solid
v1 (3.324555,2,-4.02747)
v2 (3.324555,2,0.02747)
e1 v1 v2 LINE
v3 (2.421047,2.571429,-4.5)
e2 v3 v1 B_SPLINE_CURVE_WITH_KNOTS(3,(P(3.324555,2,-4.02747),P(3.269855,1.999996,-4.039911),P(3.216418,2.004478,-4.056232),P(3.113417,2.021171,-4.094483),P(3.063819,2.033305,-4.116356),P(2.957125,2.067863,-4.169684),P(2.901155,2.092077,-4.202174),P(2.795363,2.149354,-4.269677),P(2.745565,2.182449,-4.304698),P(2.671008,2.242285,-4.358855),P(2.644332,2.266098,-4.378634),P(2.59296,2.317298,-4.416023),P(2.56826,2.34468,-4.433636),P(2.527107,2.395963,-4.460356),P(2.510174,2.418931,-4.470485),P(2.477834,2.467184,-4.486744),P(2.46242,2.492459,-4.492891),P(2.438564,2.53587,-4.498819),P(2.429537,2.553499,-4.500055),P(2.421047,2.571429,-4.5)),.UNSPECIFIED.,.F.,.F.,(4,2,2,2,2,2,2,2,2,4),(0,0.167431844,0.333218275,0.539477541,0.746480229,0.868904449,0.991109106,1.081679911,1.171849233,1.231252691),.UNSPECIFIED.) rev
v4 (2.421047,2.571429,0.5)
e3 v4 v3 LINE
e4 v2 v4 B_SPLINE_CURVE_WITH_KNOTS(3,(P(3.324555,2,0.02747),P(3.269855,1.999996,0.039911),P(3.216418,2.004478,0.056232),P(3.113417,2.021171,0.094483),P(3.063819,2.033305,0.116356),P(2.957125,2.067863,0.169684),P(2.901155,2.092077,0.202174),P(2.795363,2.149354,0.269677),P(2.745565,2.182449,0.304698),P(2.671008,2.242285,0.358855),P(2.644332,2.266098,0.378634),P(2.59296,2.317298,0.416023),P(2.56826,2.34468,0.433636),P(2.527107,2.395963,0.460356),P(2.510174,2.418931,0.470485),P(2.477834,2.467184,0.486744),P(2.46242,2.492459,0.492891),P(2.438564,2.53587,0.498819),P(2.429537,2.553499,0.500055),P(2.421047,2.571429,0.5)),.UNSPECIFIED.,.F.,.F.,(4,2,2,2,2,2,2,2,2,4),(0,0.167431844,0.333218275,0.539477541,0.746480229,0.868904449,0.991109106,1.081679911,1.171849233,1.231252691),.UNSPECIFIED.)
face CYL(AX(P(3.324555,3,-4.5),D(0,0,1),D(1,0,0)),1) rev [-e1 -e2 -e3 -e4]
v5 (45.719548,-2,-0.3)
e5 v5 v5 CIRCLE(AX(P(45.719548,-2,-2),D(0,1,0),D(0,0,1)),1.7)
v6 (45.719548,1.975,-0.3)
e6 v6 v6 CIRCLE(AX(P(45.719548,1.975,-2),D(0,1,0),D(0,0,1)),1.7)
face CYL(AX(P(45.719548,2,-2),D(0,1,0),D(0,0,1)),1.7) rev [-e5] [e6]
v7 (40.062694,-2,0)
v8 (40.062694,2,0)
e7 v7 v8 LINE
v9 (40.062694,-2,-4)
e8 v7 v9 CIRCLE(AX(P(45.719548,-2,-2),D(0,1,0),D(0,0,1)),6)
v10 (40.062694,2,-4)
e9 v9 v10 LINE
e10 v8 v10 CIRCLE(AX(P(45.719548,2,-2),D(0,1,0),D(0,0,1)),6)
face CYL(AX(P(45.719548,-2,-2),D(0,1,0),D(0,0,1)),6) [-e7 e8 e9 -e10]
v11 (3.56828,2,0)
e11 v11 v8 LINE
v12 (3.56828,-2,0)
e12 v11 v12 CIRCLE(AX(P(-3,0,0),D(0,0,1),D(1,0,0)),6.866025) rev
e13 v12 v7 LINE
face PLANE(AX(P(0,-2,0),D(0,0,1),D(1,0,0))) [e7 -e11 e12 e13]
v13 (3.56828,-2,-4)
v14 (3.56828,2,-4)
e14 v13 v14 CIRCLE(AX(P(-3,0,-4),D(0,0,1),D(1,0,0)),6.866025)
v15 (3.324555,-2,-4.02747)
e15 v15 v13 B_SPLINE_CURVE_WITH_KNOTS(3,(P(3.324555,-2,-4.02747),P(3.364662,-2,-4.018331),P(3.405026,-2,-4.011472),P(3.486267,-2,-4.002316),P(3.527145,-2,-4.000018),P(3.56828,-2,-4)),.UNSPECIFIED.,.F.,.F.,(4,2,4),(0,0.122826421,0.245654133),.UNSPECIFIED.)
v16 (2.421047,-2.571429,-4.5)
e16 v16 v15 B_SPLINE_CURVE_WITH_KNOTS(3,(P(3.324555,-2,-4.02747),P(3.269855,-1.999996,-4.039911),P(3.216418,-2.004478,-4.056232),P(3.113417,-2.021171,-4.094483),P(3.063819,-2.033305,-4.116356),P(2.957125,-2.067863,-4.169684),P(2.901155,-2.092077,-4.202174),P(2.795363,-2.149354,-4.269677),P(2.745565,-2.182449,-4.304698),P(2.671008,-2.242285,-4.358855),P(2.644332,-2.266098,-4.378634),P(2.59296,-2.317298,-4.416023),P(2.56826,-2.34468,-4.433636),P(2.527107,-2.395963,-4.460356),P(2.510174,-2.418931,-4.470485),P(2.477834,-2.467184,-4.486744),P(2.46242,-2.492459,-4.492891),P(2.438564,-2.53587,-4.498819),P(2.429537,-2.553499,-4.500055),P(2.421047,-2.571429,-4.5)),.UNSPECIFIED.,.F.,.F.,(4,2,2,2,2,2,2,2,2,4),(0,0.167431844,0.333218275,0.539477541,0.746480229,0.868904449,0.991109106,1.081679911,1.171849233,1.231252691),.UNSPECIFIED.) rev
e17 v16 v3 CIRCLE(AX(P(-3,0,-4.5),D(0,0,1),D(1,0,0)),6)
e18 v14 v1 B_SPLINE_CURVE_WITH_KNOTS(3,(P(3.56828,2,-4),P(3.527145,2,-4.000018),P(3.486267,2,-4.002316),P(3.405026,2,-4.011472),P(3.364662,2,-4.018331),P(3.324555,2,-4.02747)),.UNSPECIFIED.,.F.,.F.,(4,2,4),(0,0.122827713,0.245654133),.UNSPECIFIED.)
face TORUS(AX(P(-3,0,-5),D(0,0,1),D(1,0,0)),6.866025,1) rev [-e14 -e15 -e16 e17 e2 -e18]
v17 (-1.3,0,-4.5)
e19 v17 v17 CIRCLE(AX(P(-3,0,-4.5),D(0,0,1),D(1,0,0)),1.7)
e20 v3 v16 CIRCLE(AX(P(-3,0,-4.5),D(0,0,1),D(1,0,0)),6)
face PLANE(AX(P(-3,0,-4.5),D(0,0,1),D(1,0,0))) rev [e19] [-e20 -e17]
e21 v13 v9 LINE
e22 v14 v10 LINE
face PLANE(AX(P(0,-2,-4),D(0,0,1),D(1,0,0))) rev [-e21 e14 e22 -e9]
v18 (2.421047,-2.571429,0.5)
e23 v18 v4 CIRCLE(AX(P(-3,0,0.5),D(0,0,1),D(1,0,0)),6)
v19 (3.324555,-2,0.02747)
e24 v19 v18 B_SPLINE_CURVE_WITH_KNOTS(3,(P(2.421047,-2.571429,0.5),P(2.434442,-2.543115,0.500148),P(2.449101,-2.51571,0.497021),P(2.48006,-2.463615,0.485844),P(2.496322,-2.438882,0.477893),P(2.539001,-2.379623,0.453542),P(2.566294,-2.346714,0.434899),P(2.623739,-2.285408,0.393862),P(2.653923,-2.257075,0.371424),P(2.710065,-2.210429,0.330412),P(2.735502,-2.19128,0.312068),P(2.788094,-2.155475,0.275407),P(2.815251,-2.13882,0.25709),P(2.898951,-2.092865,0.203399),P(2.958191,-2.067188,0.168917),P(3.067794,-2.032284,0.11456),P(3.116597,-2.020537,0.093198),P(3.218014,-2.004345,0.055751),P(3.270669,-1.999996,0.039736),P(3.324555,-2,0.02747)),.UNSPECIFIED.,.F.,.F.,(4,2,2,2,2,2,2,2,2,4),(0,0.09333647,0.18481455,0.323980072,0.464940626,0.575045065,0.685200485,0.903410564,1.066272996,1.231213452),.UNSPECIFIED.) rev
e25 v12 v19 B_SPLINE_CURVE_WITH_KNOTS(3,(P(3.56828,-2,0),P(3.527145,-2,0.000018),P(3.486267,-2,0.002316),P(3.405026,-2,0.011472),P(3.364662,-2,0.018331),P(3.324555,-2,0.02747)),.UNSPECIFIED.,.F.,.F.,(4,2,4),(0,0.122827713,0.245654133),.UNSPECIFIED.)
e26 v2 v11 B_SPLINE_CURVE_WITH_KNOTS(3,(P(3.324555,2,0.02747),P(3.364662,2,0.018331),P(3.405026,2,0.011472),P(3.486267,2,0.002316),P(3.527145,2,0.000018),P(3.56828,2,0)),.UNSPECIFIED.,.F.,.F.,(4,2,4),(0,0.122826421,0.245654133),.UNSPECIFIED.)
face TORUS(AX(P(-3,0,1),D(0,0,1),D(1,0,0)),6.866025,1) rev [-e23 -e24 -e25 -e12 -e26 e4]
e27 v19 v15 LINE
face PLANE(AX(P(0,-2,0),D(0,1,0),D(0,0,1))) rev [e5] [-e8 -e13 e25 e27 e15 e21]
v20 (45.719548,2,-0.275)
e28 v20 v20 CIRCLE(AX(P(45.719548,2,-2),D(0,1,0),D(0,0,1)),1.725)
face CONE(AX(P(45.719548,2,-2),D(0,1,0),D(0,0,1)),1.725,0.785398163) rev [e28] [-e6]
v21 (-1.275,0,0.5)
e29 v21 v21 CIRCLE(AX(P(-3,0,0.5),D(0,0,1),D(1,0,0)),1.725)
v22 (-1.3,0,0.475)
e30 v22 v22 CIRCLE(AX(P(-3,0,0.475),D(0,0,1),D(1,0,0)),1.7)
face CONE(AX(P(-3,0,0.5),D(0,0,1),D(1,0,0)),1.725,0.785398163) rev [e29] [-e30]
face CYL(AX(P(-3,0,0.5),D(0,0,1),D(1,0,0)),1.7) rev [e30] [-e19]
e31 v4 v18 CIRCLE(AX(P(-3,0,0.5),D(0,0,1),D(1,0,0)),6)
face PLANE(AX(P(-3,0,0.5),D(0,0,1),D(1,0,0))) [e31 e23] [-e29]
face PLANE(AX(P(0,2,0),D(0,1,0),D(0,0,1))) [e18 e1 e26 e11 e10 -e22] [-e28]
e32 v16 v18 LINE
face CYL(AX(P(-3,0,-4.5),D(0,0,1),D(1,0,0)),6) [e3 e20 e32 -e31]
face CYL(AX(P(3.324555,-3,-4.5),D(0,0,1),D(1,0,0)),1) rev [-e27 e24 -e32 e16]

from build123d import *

# Parameters (mm, degrees)
BOSS_EXTRUDE10_DEPTH           = 2.5
BOSS_EXTRUDE10_DEPTH_BACK      = 2.5
SKETCH7_R                      = 6
BOSS_EXTRUDE11_DEPTH           = 2
BOSS_EXTRUDE11_DEPTH_BACK      = 2
FILLET4_R                      = 1
M3_CLEARANCE_HOLE1_D           = 3.4
M3_CLEARANCE_HOLE1_CSINK_D     = 3.45
M3_CLEARANCE_HOLE1_CSINK_ANGLE = 90
M3_CLEARANCE_HOLE2_D           = 3.4
M3_CLEARANCE_HOLE2_CSINK_D     = 3.45
M3_CLEARANCE_HOLE2_CSINK_ANGLE = 90


with BuildPart() as part:
    # Sketch7 → Boss-Extrude10 (new, two sides: drawn at the far end of the back side and taken through both)
    with BuildSketch(Plane.XY.offset(-2).offset(-BOSS_EXTRUDE10_DEPTH_BACK)):
        with Locations((-3, 0)):
            Circle(SKETCH7_R)
    extrude(amount=BOSS_EXTRUDE10_DEPTH + BOSS_EXTRUDE10_DEPTH_BACK)

    # Sketch4 → Boss-Extrude11 (add, two sides: drawn at the far end of the back side and taken through both)
    with BuildSketch(Plane(origin=(0, 0, 0), x_dir=(1, 0, 0), z_dir=(0, 1, 0)).offset(-BOSS_EXTRUDE11_DEPTH_BACK)):
        with BuildLine():
            ThreePointArc((40.062693756, 4), (39.719548005, 2), (40.062693756, 0))
            Line((40.062693756, 0), (45.719548005, 0))
            Line((45.719548005, 0), (45.719548005, 4))
            Line((45.719548005, 4), (40.062693756, 4))
        make_face()
        with BuildLine():
            Line((45.719548005, 0), (40.062693756, 0))
            ThreePointArc((40.062693756, 0), (46.734159878, -3.913591358), (51.719548005, 2))
            ThreePointArc((51.719548005, 2), (46.734159878, 7.913591358), (40.062693756, 4))
            Line((40.062693756, 4), (45.719548005, 4))
            Line((45.719548005, 4), (45.719548005, 0))
        make_face()
        with BuildLine():
            Line((0, 4), (0, 0))
            Line((0, 0), (40.062693756, 0))
            ThreePointArc((40.062693756, 0), (39.719548005, 2), (40.062693756, 4))
            Line((40.062693756, 4), (0, 4))
        make_face()
    extrude(amount=BOSS_EXTRUDE11_DEPTH + BOSS_EXTRUDE11_DEPTH_BACK)

    # Fillet4
    # the kernel refuses this fillet: 1 mm, written as the material it adds along each edge
    with BuildSketch(Plane(origin=(2.656854249, 2, 0), x_dir=(-0.381458859418171, 0.9243858169462511, 1.7363680755605478e-15), z_dir=(0, 0, -1)), Plane(origin=(2.656854249, -2, -4), x_dir=(-0.3814588594181449, -0.924385816946262, 1.7363680755604279e-15), z_dir=(0, 0, 1))) as fillet4_piece_1:
        with BuildLine():
            CenterArc((0.669685328, 0.998672259), FILLET4_R, 202.42407708, 64.623066475)
            Line((-0.254700489, 0.6172134), (-0.273188205, 0.609584223))
            Line((-0.273188205, 0.609584223), (-0.018487716, -0.007629177))
            Line((-0.018487716, -0.007629177), (0.001030285, -0.019973445))
            ThreePointArc((0.001030285, -0.019973445), (0.309085536, -0.012033556), (0.617140787, -0.019973445))
            Line((0.617140787, -0.019973445), (0.618171072, 0))
        make_face()
    extrude(amount=4)
    with BuildSketch(Plane(origin=(-3, 0, -4), x_dir=(0.764399035602867, -0.6447434484889372, 0), z_dir=(-0.6447434484889372, -0.764399035602867, 0))) as fillet4_piece_2_section:
        with BuildLine():
            CenterArc((6.866025404, -1), FILLET4_R, 90, 60)
            Line((6.866025404, 0), (6.866025404, 0.02))
            Line((6.866025404, 0.02), (6, 0.02))
            Line((6, 0.02), (5.98, 0))
            ThreePointArc((5.98, 0), (5.98, -0.25), (5.982679492, -0.49))
            Line((5.982679492, -0.49), (6, -0.5))
        make_face()
    fillet4_piece_2 = revolve(axis=Axis((-3, 0, -4), (0, 0, 1)), revolution_arc=40.146442844, mode=Mode.PRIVATE)
    fillet4_piece_2 = split(fillet4_piece_2, bisect_by=Plane(origin=(3.105396532, -2, -4.129597007), z_dir=(0, 1, 0)), keep=Keep.TOP, mode=Mode.PRIVATE)
    add(fillet4_piece_2)
    with BuildSketch(Plane(origin=(-3, 0, 0), x_dir=(0.7643990356028665, 0.6447434484889378, 0), z_dir=(-0.6447434484889378, 0.7643990356028665, 0))) as fillet4_piece_3_section:
        with BuildLine():
            CenterArc((6.866025404, -1), FILLET4_R, 90, 60)
            Line((6.866025404, 0), (6.866025404, 0.02))
            Line((6.866025404, 0.02), (6, 0.02))
            Line((6, 0.02), (5.98, 0))
            ThreePointArc((5.98, 0), (5.98, -0.25), (5.982679492, -0.49))
            Line((5.982679492, -0.49), (6, -0.5))
        make_face()
    fillet4_piece_3 = revolve(axis=Axis((-3, 0, 0), (0, 0, -1)), revolution_arc=40.146442844, mode=Mode.PRIVATE)
    fillet4_piece_3 = split(fillet4_piece_3, bisect_by=Plane(origin=(3.105396532, 2, 0.129597007), z_dir=(0, -1, 0)), keep=Keep.TOP, mode=Mode.PRIVATE)
    add(fillet4_piece_3)
    with BuildSketch(Plane(origin=(-3, 0, 0), x_dir=(1, 0, 0), z_dir=(0, 1, 0))) as fillet4_piece_4_section:
        with BuildLine():
            CenterArc((6.866025404, -1), FILLET4_R, 90, 60)
            Line((6.866025404, 0), (6.866025404, 0.02))
            Line((6.866025404, 0.02), (6, 0.02))
            Line((6, 0.02), (5.98, 0))
            ThreePointArc((5.98, 0), (5.98, -0.25), (5.982679492, -0.49))
            Line((5.982679492, -0.49), (6, -0.5))
        make_face()
    fillet4_piece_4 = revolve(axis=Axis((-3, 0, 0), (0, 0, -1)), revolution_arc=40.146442844, mode=Mode.PRIVATE)
    fillet4_piece_4 = split(fillet4_piece_4, bisect_by=Plane(origin=(3.105396981, -2, 0.129596926), z_dir=(0, 1, 0)), keep=Keep.TOP, mode=Mode.PRIVATE)
    add(fillet4_piece_4)
    with BuildSketch(Plane(origin=(-3, 0, -4), x_dir=(1, 0, 0), z_dir=(0, -1, 0))) as fillet4_piece_5_section:
        with BuildLine():
            CenterArc((6.866025404, -1), FILLET4_R, 90, 60)
            Line((6.866025404, 0), (6.866025404, 0.02))
            Line((6.866025404, 0.02), (6, 0.02))
            Line((6, 0.02), (5.98, 0))
            ThreePointArc((5.98, 0), (5.98, -0.25), (5.982679492, -0.49))
            Line((5.982679492, -0.49), (6, -0.5))
        make_face()
    fillet4_piece_5 = revolve(axis=Axis((-3, 0, -4), (0, 0, 1)), revolution_arc=40.146442844, mode=Mode.PRIVATE)
    fillet4_piece_5 = split(fillet4_piece_5, bisect_by=Plane(origin=(3.105396981, 2, -4.129596926), z_dir=(0, -1, 0)), keep=Keep.TOP, mode=Mode.PRIVATE)
    add(fillet4_piece_5)
    with BuildSketch(Plane(origin=(-3, 0, 0), x_dir=(0.7643990356028665, 0.6447434484889378, 0), z_dir=(-0.6447434484889378, 0.7643990356028665, 0))) as fillet4_piece_6a_section:
        with BuildLine():
            CenterArc((6.866025404, -1), FILLET4_R, 90, 60)
            Line((6.866025404, 0), (6.866025404, 0.02))
            Line((6.866025404, 0.02), (6, 0.02))
            Line((6, 0.02), (5.98, 0))
            ThreePointArc((5.98, 0), (5.98, -0.25), (5.982679492, -0.49))
            Line((5.982679492, -0.49), (6, -0.5))
        make_face()
    fillet4_piece_6a = revolve(axis=Axis((-3, 0, 0), (0, 0, -1)), revolution_arc=40.146442844, mode=Mode.PRIVATE)
    fillet4_piece_6a = split(fillet4_piece_6a, bisect_by=Plane(origin=(2.392166005, 2, 0.125287607), z_dir=(0, 1, 0)), keep=Keep.TOP, mode=Mode.PRIVATE)
    with BuildSketch(Plane(origin=(2.656854249, 2, 1.669252677), x_dir=(-0.38145885941817037, 0.9243858169462514, 1.7363680755605446e-15), z_dir=(0, 0, -1))) as fillet4_piece_6b_section:
        with BuildLine():
            CenterArc((0.669685328, 0.998672259), FILLET4_R, 202.42407708, 64.623066475)
            Line((-0.254700489, 0.6172134), (-0.273188205, 0.609584223))
            Line((-0.273188205, 0.609584223), (-0.018487716, -0.007629177))
            Line((-0.018487716, -0.007629177), (0.001030285, -0.019973445))
            ThreePointArc((0.001030285, -0.019973445), (0.309085536, -0.012033556), (0.617140787, -0.019973445))
            Line((0.617140787, -0.019973445), (0.618171072, 0))
        make_face()
    fillet4_piece_6b = extrude(amount=5.669252677, mode=Mode.PRIVATE)
    fillet4_piece_6b = split(fillet4_piece_6b, bisect_by=Plane(origin=(2.758670991, 2.124773094, 0.5), z_dir=(0, 0, -1)), keep=Keep.TOP, mode=Mode.PRIVATE)
    fillet4_piece_6b = split(fillet4_piece_6b, bisect_by=Plane(origin=(2.758670991, 2.124773094, 0), z_dir=(0, 0, 1)), keep=Keep.TOP, mode=Mode.PRIVATE)
    fillet4_piece_6 = fillet4_piece_6a & fillet4_piece_6b
    add(fillet4_piece_6)
    with BuildSketch(Plane(origin=(-3, 0, -4), x_dir=(1, 0, 0), z_dir=(0, -1, 0))) as fillet4_piece_7a_section:
        with BuildLine():
            CenterArc((6.866025404, -1), FILLET4_R, 90, 60)
            Line((6.866025404, 0), (6.866025404, 0.02))
            Line((6.866025404, 0.02), (6, 0.02))
            Line((6, 0.02), (5.98, 0))
            ThreePointArc((5.98, 0), (5.98, -0.25), (5.982679492, -0.49))
            Line((5.982679492, -0.49), (6, -0.5))
        make_face()
    fillet4_piece_7a = revolve(axis=Axis((-3, 0, -4), (0, 0, 1)), revolution_arc=40.146442844, mode=Mode.PRIVATE)
    fillet4_piece_7a = split(fillet4_piece_7a, bisect_by=Plane(origin=(2.392165487, 2, -4.125287706), z_dir=(0, 1, 0)), keep=Keep.TOP, mode=Mode.PRIVATE)
    with BuildSketch(Plane(origin=(2.656854249, 2, 0), x_dir=(-0.381458859418171, 0.9243858169462511, 1.7363680755605478e-15), z_dir=(0, 0, -1))) as fillet4_piece_7b_section:
        with BuildLine():
            CenterArc((0.669685328, 0.998672259), FILLET4_R, 202.42407708, 64.623066475)
            Line((-0.254700489, 0.6172134), (-0.273188205, 0.609584223))
            Line((-0.273188205, 0.609584223), (-0.018487716, -0.007629177))
            Line((-0.018487716, -0.007629177), (0.001030285, -0.019973445))
            ThreePointArc((0.001030285, -0.019973445), (0.309085536, -0.012033556), (0.617140787, -0.019973445))
            Line((0.617140787, -0.019973445), (0.618171072, 0))
        make_face()
    fillet4_piece_7b = extrude(amount=5.669252677, mode=Mode.PRIVATE)
    fillet4_piece_7b = split(fillet4_piece_7b, bisect_by=Plane(origin=(2.758670991, 2.124773094, -4.5), z_dir=(0, 0, 1)), keep=Keep.TOP, mode=Mode.PRIVATE)
    fillet4_piece_7b = split(fillet4_piece_7b, bisect_by=Plane(origin=(2.758670991, 2.124773094, -4), z_dir=(0, 0, -1)), keep=Keep.TOP, mode=Mode.PRIVATE)
    fillet4_piece_7 = fillet4_piece_7a & fillet4_piece_7b
    add(fillet4_piece_7)
    with BuildSketch(Plane(origin=(2.656854249, -2, -5.669252677), x_dir=(-0.38145885941816965, -0.9243858169462517, 1.7363680755605413e-15), z_dir=(0, 0, 1))) as fillet4_piece_8a_section:
        with BuildLine():
            CenterArc((0.669685328, 0.998672259), FILLET4_R, 202.42407708, 64.623066475)
            Line((-0.254700489, 0.6172134), (-0.273188205, 0.609584223))
            Line((-0.273188205, 0.609584223), (-0.018487716, -0.007629177))
            Line((-0.018487716, -0.007629177), (0.001030285, -0.019973445))
            ThreePointArc((0.001030285, -0.019973445), (0.309085536, -0.012033556), (0.617140787, -0.019973445))
            Line((0.617140787, -0.019973445), (0.618171072, 0))
        make_face()
    fillet4_piece_8a = extrude(amount=5.669252677, mode=Mode.PRIVATE)
    fillet4_piece_8a = split(fillet4_piece_8a, bisect_by=Plane(origin=(2.758670991, -2.124773094, -4.5), z_dir=(0, 0, 1)), keep=Keep.TOP, mode=Mode.PRIVATE)
    fillet4_piece_8a = split(fillet4_piece_8a, bisect_by=Plane(origin=(2.758670991, -2.124773094, -4), z_dir=(0, 0, -1)), keep=Keep.TOP, mode=Mode.PRIVATE)
    with BuildSketch(Plane(origin=(-3, 0, -4), x_dir=(0.764399035602867, -0.6447434484889372, 0), z_dir=(-0.6447434484889372, -0.764399035602867, 0))) as fillet4_piece_8b_section:
        with BuildLine():
            CenterArc((6.866025404, -1), FILLET4_R, 90, 60)
            Line((6.866025404, 0), (6.866025404, 0.02))
            Line((6.866025404, 0.02), (6, 0.02))
            Line((6, 0.02), (5.98, 0))
            ThreePointArc((5.98, 0), (5.98, -0.25), (5.982679492, -0.49))
            Line((5.982679492, -0.49), (6, -0.5))
        make_face()
    fillet4_piece_8b = revolve(axis=Axis((-3, 0, -4), (0, 0, 1)), revolution_arc=40.146442844, mode=Mode.PRIVATE)
    fillet4_piece_8b = split(fillet4_piece_8b, bisect_by=Plane(origin=(2.392166005, -2, -4.125287607), z_dir=(0, -1, 0)), keep=Keep.TOP, mode=Mode.PRIVATE)
    fillet4_piece_8 = fillet4_piece_8a & fillet4_piece_8b
    add(fillet4_piece_8)
    with BuildSketch(Plane(origin=(-3, 0, 0), x_dir=(1, 0, 0), z_dir=(0, 1, 0))) as fillet4_piece_9a_section:
        with BuildLine():
            CenterArc((6.866025404, -1), FILLET4_R, 90, 60)
            Line((6.866025404, 0), (6.866025404, 0.02))
            Line((6.866025404, 0.02), (6, 0.02))
            Line((6, 0.02), (5.98, 0))
            ThreePointArc((5.98, 0), (5.98, -0.25), (5.982679492, -0.49))
            Line((5.982679492, -0.49), (6, -0.5))
        make_face()
    fillet4_piece_9a = revolve(axis=Axis((-3, 0, 0), (0, 0, -1)), revolution_arc=40.146442844, mode=Mode.PRIVATE)
    fillet4_piece_9a = split(fillet4_piece_9a, bisect_by=Plane(origin=(2.392165487, -2, 0.125287706), z_dir=(0, -1, 0)), keep=Keep.TOP, mode=Mode.PRIVATE)
    with BuildSketch(Plane(origin=(2.656854249, -2, -4), x_dir=(-0.3814588594181449, -0.924385816946262, 1.7363680755604279e-15), z_dir=(0, 0, 1))) as fillet4_piece_9b_section:
        with BuildLine():
            CenterArc((0.669685328, 0.998672259), FILLET4_R, 202.42407708, 64.623066475)
            Line((-0.254700489, 0.6172134), (-0.273188205, 0.609584223))
            Line((-0.273188205, 0.609584223), (-0.018487716, -0.007629177))
            Line((-0.018487716, -0.007629177), (0.001030285, -0.019973445))
            ThreePointArc((0.001030285, -0.019973445), (0.309085536, -0.012033556), (0.617140787, -0.019973445))
            Line((0.617140787, -0.019973445), (0.618171072, 0))
        make_face()
    fillet4_piece_9b = extrude(amount=5.669252677, mode=Mode.PRIVATE)
    fillet4_piece_9b = split(fillet4_piece_9b, bisect_by=Plane(origin=(2.758670991, -2.124773094, 0.5), z_dir=(0, 0, -1)), keep=Keep.TOP, mode=Mode.PRIVATE)
    fillet4_piece_9b = split(fillet4_piece_9b, bisect_by=Plane(origin=(2.758670991, -2.124773094, 0), z_dir=(0, 0, 1)), keep=Keep.TOP, mode=Mode.PRIVATE)
    fillet4_piece_9 = fillet4_piece_9a & fillet4_piece_9b
    add(fillet4_piece_9)

    # M3 Clearance Hole1 (through all)
    with Locations(Plane.XY.offset(0.5)):
        with Locations((-3, 0)):
            CounterSinkHole(M3_CLEARANCE_HOLE1_D / 2, M3_CLEARANCE_HOLE1_CSINK_D / 2, counter_sink_angle=M3_CLEARANCE_HOLE1_CSINK_ANGLE)

    # M3 Clearance Hole2 (through all)
    with Locations(Plane(origin=(0, 2, 0), x_dir=(1, 0, 0), z_dir=(0, 1, 0))):
        with Locations((45.719548005, 2)):
            CounterSinkHole(M3_CLEARANCE_HOLE2_D / 2, M3_CLEARANCE_HOLE2_CSINK_D / 2, counter_sink_angle=M3_CLEARANCE_HOLE2_CSINK_ANGLE)


solid = part.part
